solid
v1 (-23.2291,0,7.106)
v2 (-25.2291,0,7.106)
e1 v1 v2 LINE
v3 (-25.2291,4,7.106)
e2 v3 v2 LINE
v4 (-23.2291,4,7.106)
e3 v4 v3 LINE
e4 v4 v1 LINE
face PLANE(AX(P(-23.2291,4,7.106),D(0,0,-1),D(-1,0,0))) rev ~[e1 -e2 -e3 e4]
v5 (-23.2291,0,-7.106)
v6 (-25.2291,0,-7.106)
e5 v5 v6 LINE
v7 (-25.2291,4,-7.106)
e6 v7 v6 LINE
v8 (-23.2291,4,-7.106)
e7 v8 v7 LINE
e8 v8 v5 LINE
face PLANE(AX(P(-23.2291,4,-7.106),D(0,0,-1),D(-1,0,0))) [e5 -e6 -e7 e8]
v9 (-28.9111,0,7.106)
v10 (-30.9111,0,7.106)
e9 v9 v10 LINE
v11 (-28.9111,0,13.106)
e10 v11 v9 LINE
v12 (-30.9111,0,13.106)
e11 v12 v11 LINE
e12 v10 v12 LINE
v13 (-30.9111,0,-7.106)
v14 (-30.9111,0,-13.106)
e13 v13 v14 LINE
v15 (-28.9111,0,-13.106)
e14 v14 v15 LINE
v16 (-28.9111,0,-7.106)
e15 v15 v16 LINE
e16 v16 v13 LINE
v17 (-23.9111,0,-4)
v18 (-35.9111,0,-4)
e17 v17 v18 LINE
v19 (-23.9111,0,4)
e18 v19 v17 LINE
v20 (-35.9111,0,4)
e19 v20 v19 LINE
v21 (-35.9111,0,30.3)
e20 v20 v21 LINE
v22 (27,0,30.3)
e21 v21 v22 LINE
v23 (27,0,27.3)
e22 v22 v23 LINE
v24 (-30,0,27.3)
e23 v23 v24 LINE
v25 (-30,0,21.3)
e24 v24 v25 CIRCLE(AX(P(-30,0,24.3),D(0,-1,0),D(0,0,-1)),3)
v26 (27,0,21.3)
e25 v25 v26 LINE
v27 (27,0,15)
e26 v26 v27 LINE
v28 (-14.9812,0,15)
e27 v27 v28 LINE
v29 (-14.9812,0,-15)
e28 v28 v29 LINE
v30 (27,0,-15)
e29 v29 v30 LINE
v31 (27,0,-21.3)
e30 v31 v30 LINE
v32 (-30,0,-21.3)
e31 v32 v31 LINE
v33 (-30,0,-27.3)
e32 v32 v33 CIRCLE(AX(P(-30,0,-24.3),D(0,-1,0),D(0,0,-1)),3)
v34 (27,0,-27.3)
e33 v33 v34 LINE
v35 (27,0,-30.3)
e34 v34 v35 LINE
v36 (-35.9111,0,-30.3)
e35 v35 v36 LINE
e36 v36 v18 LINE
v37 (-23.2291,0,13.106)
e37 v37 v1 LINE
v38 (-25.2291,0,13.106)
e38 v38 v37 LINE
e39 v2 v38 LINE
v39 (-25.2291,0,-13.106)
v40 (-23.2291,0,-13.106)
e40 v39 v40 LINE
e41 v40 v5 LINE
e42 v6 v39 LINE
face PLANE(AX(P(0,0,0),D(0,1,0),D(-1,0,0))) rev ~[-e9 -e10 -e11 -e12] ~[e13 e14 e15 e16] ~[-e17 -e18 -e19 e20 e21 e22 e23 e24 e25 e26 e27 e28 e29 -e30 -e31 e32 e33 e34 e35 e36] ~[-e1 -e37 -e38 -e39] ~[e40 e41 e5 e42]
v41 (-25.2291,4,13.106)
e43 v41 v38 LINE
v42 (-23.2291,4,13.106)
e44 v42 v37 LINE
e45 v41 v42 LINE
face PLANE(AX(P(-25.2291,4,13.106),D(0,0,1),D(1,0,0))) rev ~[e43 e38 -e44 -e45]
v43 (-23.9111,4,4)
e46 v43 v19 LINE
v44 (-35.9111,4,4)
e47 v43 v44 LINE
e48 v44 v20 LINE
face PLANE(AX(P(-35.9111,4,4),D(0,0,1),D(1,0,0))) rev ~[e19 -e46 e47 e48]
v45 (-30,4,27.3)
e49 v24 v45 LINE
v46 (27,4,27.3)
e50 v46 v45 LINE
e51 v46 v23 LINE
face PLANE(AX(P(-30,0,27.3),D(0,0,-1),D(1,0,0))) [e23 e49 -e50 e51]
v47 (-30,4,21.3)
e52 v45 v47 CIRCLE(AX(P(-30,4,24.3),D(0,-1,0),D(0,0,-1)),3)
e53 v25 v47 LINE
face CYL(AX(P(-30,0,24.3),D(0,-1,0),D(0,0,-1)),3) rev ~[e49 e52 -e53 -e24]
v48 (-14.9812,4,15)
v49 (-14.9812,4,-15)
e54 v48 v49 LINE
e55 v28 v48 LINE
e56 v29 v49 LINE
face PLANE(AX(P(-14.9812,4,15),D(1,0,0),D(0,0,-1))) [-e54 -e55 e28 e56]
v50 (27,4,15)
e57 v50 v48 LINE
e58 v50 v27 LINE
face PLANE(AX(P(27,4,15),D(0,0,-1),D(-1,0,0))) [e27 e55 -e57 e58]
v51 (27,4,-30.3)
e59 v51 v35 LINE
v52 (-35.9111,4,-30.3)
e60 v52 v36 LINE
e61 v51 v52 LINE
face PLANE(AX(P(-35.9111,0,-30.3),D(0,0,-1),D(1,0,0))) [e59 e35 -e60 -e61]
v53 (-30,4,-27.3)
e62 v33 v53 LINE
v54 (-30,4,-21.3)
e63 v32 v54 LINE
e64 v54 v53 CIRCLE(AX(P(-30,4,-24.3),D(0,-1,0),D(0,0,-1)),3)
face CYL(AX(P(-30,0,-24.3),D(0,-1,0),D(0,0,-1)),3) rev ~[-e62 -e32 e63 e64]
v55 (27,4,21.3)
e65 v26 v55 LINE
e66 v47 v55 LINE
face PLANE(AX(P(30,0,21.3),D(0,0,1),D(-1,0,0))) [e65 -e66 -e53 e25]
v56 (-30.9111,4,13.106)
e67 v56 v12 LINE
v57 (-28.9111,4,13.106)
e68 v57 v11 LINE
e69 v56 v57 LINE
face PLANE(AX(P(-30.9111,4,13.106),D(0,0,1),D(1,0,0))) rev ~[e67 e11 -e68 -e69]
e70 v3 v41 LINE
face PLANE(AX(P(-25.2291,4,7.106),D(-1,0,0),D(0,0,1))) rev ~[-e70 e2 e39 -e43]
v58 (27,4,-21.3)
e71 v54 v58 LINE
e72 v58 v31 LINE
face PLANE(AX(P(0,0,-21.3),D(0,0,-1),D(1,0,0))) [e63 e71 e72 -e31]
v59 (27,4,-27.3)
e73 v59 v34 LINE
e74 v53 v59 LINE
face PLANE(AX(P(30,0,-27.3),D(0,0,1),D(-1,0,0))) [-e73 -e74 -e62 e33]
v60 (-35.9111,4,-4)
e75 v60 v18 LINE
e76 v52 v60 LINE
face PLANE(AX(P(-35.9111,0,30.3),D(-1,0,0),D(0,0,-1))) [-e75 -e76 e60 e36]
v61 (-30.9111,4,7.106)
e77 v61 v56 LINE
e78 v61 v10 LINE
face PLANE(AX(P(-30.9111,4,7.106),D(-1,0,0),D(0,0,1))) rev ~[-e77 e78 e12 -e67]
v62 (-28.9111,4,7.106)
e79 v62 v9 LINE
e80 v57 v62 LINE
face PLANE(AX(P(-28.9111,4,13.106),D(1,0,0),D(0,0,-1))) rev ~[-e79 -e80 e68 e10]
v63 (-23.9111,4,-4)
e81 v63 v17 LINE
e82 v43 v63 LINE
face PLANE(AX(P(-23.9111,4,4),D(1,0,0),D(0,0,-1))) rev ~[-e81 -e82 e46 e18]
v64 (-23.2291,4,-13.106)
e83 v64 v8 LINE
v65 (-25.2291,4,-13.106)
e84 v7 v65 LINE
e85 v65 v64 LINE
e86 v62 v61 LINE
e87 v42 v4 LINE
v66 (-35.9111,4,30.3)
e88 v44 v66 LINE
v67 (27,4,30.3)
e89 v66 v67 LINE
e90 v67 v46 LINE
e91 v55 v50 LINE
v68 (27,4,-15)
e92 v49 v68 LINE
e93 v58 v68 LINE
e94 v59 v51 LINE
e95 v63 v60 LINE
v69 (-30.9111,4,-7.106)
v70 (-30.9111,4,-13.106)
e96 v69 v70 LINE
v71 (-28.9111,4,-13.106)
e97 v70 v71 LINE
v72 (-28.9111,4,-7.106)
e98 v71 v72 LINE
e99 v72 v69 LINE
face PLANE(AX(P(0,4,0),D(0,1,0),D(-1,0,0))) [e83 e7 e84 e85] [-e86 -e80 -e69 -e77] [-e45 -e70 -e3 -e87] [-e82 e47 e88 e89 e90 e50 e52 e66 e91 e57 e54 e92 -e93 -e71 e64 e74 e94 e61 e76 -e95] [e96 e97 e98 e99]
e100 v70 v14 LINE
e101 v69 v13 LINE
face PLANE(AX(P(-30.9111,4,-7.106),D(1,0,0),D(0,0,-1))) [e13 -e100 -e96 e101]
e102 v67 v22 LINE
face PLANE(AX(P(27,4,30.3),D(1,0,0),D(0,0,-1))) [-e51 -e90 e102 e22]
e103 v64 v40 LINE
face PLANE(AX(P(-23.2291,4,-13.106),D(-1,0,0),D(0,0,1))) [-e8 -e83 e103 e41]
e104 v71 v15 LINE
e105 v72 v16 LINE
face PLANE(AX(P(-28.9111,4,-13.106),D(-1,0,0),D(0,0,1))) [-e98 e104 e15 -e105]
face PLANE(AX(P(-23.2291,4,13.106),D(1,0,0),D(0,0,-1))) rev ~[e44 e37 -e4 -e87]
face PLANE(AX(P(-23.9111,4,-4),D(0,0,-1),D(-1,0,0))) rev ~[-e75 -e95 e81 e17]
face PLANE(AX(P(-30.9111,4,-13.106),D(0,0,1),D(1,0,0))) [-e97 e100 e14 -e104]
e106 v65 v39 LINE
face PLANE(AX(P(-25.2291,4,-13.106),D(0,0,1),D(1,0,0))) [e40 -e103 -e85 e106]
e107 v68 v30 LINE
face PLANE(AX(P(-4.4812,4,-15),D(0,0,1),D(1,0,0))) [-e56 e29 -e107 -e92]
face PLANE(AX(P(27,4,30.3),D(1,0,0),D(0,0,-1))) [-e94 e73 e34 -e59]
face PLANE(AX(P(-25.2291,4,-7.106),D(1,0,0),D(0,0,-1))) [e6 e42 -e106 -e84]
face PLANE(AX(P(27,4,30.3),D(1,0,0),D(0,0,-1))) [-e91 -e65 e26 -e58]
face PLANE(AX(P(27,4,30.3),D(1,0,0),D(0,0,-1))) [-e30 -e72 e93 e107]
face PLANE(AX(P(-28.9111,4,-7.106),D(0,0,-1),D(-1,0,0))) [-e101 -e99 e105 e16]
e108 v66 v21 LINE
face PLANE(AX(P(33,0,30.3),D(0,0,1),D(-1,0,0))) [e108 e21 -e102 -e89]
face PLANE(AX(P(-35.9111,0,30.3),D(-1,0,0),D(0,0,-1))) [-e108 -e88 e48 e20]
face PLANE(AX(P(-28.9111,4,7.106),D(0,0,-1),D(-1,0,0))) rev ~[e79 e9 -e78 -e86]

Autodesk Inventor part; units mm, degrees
ref_plane "YZ Plane" through (0, 0, 0) normal (1, 0, 0) x (0, 1, 0)
ref_plane "XZ Plane" through (0, 0, 0) normal (0, 1, 0) x (-1, 0, 0)
ref_plane "XY Plane" through (0, 0, 0) normal (0, 0, 1) x (1, 0, 0)
sketch "Эскиз1" plane through (0, 0, 0) normal (0, 1, 0) x (-1, 0, 0)
  line L0 (0, 0) -> (0, 24.3)
  line L1 (0, 0) -> (0, -24.3)
  line L2 (-30, 24.3) -> (30, 24.3) construction
  line L3 (-30, 21.3) -> (30, 21.3)
  line L4 (30, 27.3) -> (-30, 27.3)
  arc A0 (-30, 27.3) -> (-30, 21.3) centre (-30, 24.3) ccw
  arc A1 (30, 21.3) -> (30, 27.3) centre (30, 24.3) ccw
  line L5 (-30, -24.3) -> (30, -24.3) construction
  line L6 (-30, -27.3) -> (30, -27.3)
  line L7 (30, -21.3) -> (-30, -21.3)
  arc A2 (-30, -21.3) -> (-30, -27.3) centre (-30, -24.3) ccw
  arc A3 (30, -27.3) -> (30, -21.3) centre (30, -24.3) ccw
  line L8 (-33, 24.3) -> (-33, 30.3)
  line L9 (-33, 30.3) -> (35.9111, 30.3)
  line L10 (35.9111, 30.3) -> (35.9111, -30.3)
  line L11 (35.9111, -30.3) -> (-33, -30.3)
  line L12 (-33, -30.3) -> (-33, 30.3)
  dimension "d0" = 24.3
  dimension "d1" = 24.3
  dimension "d2" = 30
  dimension "d3" = 6
  dimension "d4" = 6
  dimension "d5" = 6
  dimension "d6" = 6
extrude "Выдавливание1" add sketch "Эскиз1" along normal blind 4 contours L1 L7 A2 L12 A0 L3 L0 | L0 L3 A1 L4 A0 L8 L9 L10 L11 L12 A2 L6 A3 L7 L1
sketch "Эскиз2" plane through (0, 4, 0) normal (0, 1, 0) x (1, 0, 0)
  line L0 (33, 30.3) -> (-35.9111, 30.3) projected
  line L1 (33, -30.3) -> (27, -30.3)
  line L2 (27, -30.3) -> (27, 30.3)
  line L3 (27, 30.3) -> (33, 30.3)
  line L4 (33, 30.3) -> (33, -30.3)
  point P0 (0, 0)
  dimension "d9" = 6
extrude "Выдавливание2" cut sketch "Эскиз2" against normal through all
sketch "Эскиз3" plane through (0, 4, 0) normal (0, 1, 0) x (1, 0, 0)
  line L0 (27, 21.3) -> (27, -21.3) projected
  line L1 (27, 0) -> (27, -15)
  line L2 (27, -15) -> (27, 15)
  line L3 (27, -15) -> (-4.4812, -15)
  line L4 (-4.4812, -15) -> (-4.4812, 15)
  line L5 (-4.4812, 15) -> (27, 15)
  line L6 (27, 15) -> (27, -15)
  point P0 (0, 0)
  dimension "d12" = 15
  dimension "d13" = 30
extrude "Выдавливание3" cut sketch "Эскиз3" against normal blind 4
move faces "Перенос1" translate (-10.5, 0, 0) faces at (-4.4812, 2.6667, -5) (-21.4937, 0, 5)
sketch "Эскиз5" plane through (0, 4, 0) normal (0, 1, 0) x (1, 0, 0)
  line L0 (-35.9111, 30.3) -> (-35.9111, -30.3) projected
  line L1 (27, -15) -> (-14.9812, -15) projected
  line L2 (-35.9111, 15.0973) -> (-14.9812, 15.0973)
  line L3 (-14.9812, 15.0973) -> (-14.9812, -15)
  line L4 (-14.9812, -15) -> (-35.9111, -15)
  line L5 (-35.9111, -15) -> (-35.9111, 15.0973)
  point P0 (0, 0)
extrude "Выдавливание5" [suppressed]
sketch "Эскиз6" plane through (-35.9111, 0, 30.3) normal (0, -1, 0) x (1, 0, 0)
  line L0 (0, -45.3973) -> (20.9298, -45.3973) projected
  line L1 (0, -45.3973) -> (0, -42.3973)
  line L2 (0, -45.3973) -> (0, -15.3) projected
  line L3 (0, -15.3) -> (0, -18.3)
  line L4 (0, -42.3973) -> (15.1843, -42.3973)
  line L5 (15.1843, -42.3973) -> (15.1843, -18.3)
  line L6 (15.1843, -18.3) -> (0, -18.3)
  line L7 (0, -18.3) -> (0, -42.3973)
  point P0 (35.9111, -30.3)
  dimension "d26" = 3
  dimension "d27" = 3
extrude "Выдавливание6" [suppressed]
chamfer "Фаска1" [suppressed]
sketch "Эскиз7" plane through (0, 4, 0) normal (0, 1, 0) x (1, 0, 0)
  line L0 (-30.9111, -13.106) -> (-28.9111, -13.106)
  line L1 (-28.9111, -13.106) -> (-28.9111, -7.106)
  line L2 (-28.9111, -7.106) -> (-30.9111, -7.106)
  line L3 (-30.9111, -7.106) -> (-30.9111, -13.106)
  line L4 (-25.2291, -13.106) -> (-23.2291, -13.106)
  line L5 (-23.2291, -13.106) -> (-23.2291, -7.106)
  line L6 (-23.2291, -7.106) -> (-25.2291, -7.106)
  line L7 (-25.2291, -7.106) -> (-25.2291, -13.106)
  line L8 (0, 0) -> (-7.2083, 0)
  line L9 (-35.9111, 30.3) -> (-35.9111, -30.3) projected
  line L10 (-30.9111, 13.106) -> (-28.9111, 13.106)
  line L11 (-28.9111, 13.106) -> (-28.9111, 7.106)
  line L12 (-28.9111, 7.106) -> (-30.9111, 7.106)
  line L13 (-30.9111, 7.106) -> (-30.9111, 13.106)
  line L14 (-25.2291, 13.106) -> (-23.2291, 13.106)
  line L15 (-23.2291, 13.106) -> (-23.2291, 7.106)
  line L16 (-23.2291, 7.106) -> (-25.2291, 7.106)
  line L17 (-25.2291, 7.106) -> (-25.2291, 13.106)
  dimension "d33" = 2
  dimension "d34" = 6
  dimension "d35" = 2
  dimension "d36" = 5
extrude "Выдавливание7" cut sketch "Эскиз7" against normal blind 10
sketch "Эскиз8" plane through (0, 4, 0) normal (0, 1, 0) x (1, 0, 0)
  line L0 (-35.9111, 30.3) -> (-35.9111, -30.3) projected
  line L1 (-35.9111, 0) -> (-35.9111, -4)
  line L2 (-35.9111, -4) -> (-25.9111, -4)
  line L3 (-35.9111, -4) -> (-23.9111, -4)
  line L4 (-23.9111, -4) -> (-23.9111, 4)
  line L5 (-23.9111, 4) -> (-35.9111, 4)
  line L6 (-35.9111, 4) -> (-35.9111, -4)
  point P0 (0, 0)
  dimension "d39" = 4
  dimension "d40" = 10
  dimension "d41" = 12
  dimension "d42" = 8
extrude "Выдавливание8" cut sketch "Эскиз8" against normal blind 10
properties part number "КВ33.044.204 - Держатель ремня"
